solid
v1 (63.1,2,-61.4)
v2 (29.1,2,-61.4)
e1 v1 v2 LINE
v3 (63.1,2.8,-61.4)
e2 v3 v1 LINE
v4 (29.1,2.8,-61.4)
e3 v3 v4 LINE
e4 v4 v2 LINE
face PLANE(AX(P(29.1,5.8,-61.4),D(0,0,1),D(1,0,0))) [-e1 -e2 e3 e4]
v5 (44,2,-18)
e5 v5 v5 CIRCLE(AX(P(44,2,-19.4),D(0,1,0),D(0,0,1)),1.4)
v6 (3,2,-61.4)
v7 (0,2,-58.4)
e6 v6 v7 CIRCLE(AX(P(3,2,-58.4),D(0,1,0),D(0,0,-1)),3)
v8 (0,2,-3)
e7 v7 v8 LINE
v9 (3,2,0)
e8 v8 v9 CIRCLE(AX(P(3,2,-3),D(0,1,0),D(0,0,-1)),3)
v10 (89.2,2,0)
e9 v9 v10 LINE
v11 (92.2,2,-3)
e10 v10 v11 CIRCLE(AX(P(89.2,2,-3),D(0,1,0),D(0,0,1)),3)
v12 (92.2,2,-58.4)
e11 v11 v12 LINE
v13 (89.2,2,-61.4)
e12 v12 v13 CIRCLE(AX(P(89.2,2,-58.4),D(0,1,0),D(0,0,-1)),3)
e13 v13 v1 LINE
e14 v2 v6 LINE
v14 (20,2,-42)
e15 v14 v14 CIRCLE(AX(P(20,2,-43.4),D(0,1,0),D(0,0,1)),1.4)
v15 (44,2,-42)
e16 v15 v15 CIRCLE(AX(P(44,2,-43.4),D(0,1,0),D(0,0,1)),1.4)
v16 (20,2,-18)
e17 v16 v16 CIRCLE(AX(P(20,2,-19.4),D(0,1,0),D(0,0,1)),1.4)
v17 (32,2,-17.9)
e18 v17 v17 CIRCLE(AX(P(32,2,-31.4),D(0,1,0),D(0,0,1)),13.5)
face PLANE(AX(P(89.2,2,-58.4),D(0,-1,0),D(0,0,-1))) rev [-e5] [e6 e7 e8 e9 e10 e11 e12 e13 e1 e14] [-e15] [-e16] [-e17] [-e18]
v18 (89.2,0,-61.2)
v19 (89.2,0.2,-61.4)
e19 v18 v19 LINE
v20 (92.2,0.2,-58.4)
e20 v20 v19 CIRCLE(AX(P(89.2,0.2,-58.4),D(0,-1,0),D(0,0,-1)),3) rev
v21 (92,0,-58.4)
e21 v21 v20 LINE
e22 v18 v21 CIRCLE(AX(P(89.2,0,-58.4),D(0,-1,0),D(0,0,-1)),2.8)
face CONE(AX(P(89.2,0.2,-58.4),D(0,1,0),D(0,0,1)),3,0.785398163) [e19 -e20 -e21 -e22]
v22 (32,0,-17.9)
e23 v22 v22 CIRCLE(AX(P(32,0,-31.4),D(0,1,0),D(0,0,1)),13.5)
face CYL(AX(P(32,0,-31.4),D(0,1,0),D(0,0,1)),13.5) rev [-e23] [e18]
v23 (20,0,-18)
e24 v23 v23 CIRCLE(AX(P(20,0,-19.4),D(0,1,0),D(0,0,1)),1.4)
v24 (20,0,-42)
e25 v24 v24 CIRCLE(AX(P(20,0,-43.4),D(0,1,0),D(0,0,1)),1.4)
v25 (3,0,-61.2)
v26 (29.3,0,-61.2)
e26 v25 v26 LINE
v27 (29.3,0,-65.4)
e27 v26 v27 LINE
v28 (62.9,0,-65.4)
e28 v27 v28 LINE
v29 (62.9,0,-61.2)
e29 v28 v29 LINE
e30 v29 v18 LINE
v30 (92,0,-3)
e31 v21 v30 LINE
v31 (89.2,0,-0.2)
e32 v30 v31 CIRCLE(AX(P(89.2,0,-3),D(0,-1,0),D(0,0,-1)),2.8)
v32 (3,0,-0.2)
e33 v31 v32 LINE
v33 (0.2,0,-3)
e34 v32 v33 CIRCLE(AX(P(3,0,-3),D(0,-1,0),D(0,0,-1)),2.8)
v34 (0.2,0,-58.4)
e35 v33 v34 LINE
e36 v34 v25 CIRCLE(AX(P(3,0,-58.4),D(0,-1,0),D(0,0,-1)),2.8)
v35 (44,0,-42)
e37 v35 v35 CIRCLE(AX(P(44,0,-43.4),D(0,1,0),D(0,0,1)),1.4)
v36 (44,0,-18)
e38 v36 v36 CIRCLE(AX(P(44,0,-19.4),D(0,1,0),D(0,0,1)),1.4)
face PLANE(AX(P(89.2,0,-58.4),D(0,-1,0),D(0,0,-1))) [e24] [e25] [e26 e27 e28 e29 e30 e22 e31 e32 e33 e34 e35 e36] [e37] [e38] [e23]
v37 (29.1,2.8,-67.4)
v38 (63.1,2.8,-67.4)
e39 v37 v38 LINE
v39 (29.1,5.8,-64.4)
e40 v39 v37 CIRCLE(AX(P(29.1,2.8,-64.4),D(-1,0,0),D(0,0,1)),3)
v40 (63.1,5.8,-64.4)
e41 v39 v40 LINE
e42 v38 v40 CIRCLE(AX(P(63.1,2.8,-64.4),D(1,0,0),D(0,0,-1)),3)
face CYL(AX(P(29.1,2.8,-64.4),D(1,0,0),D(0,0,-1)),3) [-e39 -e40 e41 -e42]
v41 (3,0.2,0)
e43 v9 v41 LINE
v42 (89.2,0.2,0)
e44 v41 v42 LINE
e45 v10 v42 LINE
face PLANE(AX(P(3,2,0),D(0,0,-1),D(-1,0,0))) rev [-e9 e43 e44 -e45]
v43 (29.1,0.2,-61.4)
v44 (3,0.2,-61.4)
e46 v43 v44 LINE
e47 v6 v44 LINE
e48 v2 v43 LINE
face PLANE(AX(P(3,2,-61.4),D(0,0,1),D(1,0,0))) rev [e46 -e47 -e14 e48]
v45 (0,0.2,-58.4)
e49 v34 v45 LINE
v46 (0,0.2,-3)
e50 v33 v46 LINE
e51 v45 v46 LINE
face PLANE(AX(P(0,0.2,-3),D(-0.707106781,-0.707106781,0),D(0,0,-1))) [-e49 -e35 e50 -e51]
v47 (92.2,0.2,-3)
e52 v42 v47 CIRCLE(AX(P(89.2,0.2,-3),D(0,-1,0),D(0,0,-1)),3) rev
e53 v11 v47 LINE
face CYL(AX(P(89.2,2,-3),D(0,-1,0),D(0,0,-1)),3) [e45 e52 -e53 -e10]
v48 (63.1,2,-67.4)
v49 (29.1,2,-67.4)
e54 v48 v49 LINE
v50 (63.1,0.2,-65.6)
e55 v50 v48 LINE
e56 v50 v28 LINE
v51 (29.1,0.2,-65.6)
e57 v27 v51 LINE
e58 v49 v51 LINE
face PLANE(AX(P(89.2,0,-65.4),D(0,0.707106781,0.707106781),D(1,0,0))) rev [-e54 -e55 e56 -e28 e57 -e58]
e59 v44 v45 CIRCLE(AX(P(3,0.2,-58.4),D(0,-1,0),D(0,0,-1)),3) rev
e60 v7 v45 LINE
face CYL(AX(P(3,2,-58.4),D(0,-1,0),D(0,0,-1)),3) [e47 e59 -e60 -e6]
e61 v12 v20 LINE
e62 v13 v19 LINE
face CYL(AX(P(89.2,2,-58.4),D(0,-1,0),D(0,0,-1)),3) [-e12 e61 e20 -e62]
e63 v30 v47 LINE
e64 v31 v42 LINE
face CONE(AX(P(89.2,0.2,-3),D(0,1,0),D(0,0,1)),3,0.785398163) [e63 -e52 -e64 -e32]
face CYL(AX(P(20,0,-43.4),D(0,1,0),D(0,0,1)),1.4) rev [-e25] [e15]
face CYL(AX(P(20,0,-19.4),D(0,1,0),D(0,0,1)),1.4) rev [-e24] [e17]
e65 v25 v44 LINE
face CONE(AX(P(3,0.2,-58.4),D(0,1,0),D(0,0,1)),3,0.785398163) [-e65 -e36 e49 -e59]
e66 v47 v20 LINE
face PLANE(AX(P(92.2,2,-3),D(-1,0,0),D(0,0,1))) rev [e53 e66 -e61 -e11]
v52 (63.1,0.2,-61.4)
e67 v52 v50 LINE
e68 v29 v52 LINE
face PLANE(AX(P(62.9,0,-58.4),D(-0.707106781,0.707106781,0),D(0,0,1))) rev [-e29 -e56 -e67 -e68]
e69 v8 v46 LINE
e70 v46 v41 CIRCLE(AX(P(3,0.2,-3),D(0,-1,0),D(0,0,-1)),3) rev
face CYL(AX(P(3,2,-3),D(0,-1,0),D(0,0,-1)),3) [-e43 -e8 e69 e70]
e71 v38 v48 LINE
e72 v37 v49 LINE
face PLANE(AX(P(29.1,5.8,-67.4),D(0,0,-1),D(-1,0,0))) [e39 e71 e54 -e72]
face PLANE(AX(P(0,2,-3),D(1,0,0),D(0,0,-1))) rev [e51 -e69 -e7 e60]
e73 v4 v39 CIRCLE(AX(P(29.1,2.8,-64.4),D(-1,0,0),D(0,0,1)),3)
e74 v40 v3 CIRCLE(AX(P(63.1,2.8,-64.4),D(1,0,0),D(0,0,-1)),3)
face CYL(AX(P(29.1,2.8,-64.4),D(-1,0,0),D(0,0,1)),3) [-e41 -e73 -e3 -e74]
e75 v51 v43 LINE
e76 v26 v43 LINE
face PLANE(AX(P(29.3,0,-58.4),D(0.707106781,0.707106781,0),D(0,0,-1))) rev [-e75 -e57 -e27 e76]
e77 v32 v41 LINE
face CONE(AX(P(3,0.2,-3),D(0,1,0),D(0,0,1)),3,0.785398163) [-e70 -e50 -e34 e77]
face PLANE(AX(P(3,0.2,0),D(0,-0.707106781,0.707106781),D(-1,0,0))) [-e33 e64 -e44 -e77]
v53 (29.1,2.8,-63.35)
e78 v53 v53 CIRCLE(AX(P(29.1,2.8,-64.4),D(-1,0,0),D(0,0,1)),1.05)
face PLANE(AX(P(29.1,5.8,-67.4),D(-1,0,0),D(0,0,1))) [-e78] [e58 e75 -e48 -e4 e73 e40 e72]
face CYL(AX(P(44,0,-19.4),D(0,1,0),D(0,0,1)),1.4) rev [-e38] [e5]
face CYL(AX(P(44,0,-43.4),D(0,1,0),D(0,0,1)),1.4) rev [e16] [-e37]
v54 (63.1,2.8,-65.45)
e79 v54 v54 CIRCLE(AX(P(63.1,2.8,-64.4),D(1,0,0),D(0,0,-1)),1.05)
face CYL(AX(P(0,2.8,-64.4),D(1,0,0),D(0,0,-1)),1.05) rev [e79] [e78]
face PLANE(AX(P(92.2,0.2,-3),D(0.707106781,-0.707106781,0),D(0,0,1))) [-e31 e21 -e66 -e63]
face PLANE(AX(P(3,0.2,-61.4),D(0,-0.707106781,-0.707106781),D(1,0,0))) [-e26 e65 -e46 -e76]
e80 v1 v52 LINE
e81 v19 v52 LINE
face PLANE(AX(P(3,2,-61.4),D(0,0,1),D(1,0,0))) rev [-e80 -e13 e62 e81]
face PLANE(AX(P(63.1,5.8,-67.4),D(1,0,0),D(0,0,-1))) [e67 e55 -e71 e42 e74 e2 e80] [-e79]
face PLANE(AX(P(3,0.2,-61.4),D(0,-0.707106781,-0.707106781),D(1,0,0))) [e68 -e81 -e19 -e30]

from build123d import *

# Parameters (mm, degrees)
EXTRUDE_1_DEPTH     = 2
SKETCH_2_W          = 34
SKETCH_2_H          = 6
EXTRUDE_2_DEPTH     = 5.8
SKETCH_3_R          = 1.05
CUT_EXTRUDE_1_DEPTH = 93.509513024
FILLET_1_R          = 3
CHAMFER_1_SIZE      = 2
SKETCH_4_R          = 1.4
SKETCH_4_R_2        = 13.5
CUT_EXTRUDE_2_DEPTH = 2
CHAMFER_2_SIZE      = 0.2


with BuildPart() as part:
    # 草图1 → 凸台-拉伸1 (new body)
    with BuildSketch(Plane(origin=(0, 0, 0), x_dir=(1, 0, 0), z_dir=(0, 1, 0))):
        with BuildLine():
            Line((3, 0), (89.2, 0))
            ThreePointArc((89.2, 0), (91.321320344, 0.878679656), (92.2, 3))
            Line((92.2, 3), (92.2, 58.4))
            ThreePointArc((92.2, 58.4), (91.321320344, 60.521320344), (89.2, 61.4))
            Line((89.2, 61.4), (3, 61.4))
            ThreePointArc((3, 61.4), (0.878679656, 60.521320344), (0, 58.4))
            Line((0, 58.4), (0, 3))
            ThreePointArc((0, 3), (0.878679656, 0.878679656), (3, 0))
        make_face()
    extrude(amount=EXTRUDE_1_DEPTH)

    # 草图2 → 凸台-拉伸2 (add)
    with BuildSketch(Plane(origin=(0, 0, 0), x_dir=(-1, 0, 0), z_dir=(0, -1, 0))):
        with Locations((-46.1, 64.4)):
            Rectangle(SKETCH_2_W, SKETCH_2_H)
    extrude(amount=-EXTRUDE_2_DEPTH)

    # 草图3 → 切除-拉伸1 (cut, through all)
    with BuildSketch(Plane(origin=(63.1, 0, 0), x_dir=(0, 0, -1), z_dir=(1, 0, 0))):
        with Locations((64.4, 2.8)):
            Circle(SKETCH_3_R)
    extrude(amount=-CUT_EXTRUDE_1_DEPTH, mode=Mode.SUBTRACT)

    # 圆角1
    fillet_1_edges = [part.edges().sort_by_distance(p)[0] for p in [
        (46.1, 5.8, -67.4),
        (46.1, 5.8, -61.4),
    ]]
    fillet(fillet_1_edges, radius=FILLET_1_R - 0.0001)  # a hair under: the kernel refuses the full size

    # 倒角1
    chamfer_1_edges = [part.edges().sort_by_distance(p)[0] for p in [
        (46.1, 0, -67.4),
    ]]
    chamfer(chamfer_1_edges, length=CHAMFER_1_SIZE)

    # 草图4 → 切除-拉伸2 (cut)
    with BuildSketch(Plane(origin=(0, 2, 0), x_dir=(1, 0, 0), z_dir=(0, 1, 0))):
        with Locations(Location((20, 43.4, 0), (0, 0, 270))):
            Circle(SKETCH_4_R)
        with Locations(Location((44, 43.4, 0), (0, 0, 270))):
            Circle(SKETCH_4_R)
        with Locations(Location((44, 19.4, 0), (0, 0, 270))):
            Circle(SKETCH_4_R)
        with Locations(Location((20, 19.4, 0), (0, 0, 270))):
            Circle(SKETCH_4_R)
        with Locations(Location((32, 31.4, 0), (0, 0, 270))):
            Circle(SKETCH_4_R_2)
    extrude(amount=-CUT_EXTRUDE_2_DEPTH, mode=Mode.SUBTRACT)

    # 倒角2
    chamfer_2_edges = [part.edges().sort_by_distance(p)[0] for p in [
        (0, 0, -30.7),
        (0.878679656, 0, -60.521320344),
        (76.15, 0, -61.4),
        (91.321320344, 0, -60.521320344),
        (16.05, 0, -61.4),
        (29.1, 0, -63.4),
        (63.1, 0, -63.4),
        (92.2, 0, -30.7),
        (91.321320344, 0, -0.878679656),
        (46.1, 0, 0),
        (0.878679656, 0, -0.878679656),
    ]]
    chamfer(chamfer_2_edges, length=CHAMFER_2_SIZE)


solid = part.part
